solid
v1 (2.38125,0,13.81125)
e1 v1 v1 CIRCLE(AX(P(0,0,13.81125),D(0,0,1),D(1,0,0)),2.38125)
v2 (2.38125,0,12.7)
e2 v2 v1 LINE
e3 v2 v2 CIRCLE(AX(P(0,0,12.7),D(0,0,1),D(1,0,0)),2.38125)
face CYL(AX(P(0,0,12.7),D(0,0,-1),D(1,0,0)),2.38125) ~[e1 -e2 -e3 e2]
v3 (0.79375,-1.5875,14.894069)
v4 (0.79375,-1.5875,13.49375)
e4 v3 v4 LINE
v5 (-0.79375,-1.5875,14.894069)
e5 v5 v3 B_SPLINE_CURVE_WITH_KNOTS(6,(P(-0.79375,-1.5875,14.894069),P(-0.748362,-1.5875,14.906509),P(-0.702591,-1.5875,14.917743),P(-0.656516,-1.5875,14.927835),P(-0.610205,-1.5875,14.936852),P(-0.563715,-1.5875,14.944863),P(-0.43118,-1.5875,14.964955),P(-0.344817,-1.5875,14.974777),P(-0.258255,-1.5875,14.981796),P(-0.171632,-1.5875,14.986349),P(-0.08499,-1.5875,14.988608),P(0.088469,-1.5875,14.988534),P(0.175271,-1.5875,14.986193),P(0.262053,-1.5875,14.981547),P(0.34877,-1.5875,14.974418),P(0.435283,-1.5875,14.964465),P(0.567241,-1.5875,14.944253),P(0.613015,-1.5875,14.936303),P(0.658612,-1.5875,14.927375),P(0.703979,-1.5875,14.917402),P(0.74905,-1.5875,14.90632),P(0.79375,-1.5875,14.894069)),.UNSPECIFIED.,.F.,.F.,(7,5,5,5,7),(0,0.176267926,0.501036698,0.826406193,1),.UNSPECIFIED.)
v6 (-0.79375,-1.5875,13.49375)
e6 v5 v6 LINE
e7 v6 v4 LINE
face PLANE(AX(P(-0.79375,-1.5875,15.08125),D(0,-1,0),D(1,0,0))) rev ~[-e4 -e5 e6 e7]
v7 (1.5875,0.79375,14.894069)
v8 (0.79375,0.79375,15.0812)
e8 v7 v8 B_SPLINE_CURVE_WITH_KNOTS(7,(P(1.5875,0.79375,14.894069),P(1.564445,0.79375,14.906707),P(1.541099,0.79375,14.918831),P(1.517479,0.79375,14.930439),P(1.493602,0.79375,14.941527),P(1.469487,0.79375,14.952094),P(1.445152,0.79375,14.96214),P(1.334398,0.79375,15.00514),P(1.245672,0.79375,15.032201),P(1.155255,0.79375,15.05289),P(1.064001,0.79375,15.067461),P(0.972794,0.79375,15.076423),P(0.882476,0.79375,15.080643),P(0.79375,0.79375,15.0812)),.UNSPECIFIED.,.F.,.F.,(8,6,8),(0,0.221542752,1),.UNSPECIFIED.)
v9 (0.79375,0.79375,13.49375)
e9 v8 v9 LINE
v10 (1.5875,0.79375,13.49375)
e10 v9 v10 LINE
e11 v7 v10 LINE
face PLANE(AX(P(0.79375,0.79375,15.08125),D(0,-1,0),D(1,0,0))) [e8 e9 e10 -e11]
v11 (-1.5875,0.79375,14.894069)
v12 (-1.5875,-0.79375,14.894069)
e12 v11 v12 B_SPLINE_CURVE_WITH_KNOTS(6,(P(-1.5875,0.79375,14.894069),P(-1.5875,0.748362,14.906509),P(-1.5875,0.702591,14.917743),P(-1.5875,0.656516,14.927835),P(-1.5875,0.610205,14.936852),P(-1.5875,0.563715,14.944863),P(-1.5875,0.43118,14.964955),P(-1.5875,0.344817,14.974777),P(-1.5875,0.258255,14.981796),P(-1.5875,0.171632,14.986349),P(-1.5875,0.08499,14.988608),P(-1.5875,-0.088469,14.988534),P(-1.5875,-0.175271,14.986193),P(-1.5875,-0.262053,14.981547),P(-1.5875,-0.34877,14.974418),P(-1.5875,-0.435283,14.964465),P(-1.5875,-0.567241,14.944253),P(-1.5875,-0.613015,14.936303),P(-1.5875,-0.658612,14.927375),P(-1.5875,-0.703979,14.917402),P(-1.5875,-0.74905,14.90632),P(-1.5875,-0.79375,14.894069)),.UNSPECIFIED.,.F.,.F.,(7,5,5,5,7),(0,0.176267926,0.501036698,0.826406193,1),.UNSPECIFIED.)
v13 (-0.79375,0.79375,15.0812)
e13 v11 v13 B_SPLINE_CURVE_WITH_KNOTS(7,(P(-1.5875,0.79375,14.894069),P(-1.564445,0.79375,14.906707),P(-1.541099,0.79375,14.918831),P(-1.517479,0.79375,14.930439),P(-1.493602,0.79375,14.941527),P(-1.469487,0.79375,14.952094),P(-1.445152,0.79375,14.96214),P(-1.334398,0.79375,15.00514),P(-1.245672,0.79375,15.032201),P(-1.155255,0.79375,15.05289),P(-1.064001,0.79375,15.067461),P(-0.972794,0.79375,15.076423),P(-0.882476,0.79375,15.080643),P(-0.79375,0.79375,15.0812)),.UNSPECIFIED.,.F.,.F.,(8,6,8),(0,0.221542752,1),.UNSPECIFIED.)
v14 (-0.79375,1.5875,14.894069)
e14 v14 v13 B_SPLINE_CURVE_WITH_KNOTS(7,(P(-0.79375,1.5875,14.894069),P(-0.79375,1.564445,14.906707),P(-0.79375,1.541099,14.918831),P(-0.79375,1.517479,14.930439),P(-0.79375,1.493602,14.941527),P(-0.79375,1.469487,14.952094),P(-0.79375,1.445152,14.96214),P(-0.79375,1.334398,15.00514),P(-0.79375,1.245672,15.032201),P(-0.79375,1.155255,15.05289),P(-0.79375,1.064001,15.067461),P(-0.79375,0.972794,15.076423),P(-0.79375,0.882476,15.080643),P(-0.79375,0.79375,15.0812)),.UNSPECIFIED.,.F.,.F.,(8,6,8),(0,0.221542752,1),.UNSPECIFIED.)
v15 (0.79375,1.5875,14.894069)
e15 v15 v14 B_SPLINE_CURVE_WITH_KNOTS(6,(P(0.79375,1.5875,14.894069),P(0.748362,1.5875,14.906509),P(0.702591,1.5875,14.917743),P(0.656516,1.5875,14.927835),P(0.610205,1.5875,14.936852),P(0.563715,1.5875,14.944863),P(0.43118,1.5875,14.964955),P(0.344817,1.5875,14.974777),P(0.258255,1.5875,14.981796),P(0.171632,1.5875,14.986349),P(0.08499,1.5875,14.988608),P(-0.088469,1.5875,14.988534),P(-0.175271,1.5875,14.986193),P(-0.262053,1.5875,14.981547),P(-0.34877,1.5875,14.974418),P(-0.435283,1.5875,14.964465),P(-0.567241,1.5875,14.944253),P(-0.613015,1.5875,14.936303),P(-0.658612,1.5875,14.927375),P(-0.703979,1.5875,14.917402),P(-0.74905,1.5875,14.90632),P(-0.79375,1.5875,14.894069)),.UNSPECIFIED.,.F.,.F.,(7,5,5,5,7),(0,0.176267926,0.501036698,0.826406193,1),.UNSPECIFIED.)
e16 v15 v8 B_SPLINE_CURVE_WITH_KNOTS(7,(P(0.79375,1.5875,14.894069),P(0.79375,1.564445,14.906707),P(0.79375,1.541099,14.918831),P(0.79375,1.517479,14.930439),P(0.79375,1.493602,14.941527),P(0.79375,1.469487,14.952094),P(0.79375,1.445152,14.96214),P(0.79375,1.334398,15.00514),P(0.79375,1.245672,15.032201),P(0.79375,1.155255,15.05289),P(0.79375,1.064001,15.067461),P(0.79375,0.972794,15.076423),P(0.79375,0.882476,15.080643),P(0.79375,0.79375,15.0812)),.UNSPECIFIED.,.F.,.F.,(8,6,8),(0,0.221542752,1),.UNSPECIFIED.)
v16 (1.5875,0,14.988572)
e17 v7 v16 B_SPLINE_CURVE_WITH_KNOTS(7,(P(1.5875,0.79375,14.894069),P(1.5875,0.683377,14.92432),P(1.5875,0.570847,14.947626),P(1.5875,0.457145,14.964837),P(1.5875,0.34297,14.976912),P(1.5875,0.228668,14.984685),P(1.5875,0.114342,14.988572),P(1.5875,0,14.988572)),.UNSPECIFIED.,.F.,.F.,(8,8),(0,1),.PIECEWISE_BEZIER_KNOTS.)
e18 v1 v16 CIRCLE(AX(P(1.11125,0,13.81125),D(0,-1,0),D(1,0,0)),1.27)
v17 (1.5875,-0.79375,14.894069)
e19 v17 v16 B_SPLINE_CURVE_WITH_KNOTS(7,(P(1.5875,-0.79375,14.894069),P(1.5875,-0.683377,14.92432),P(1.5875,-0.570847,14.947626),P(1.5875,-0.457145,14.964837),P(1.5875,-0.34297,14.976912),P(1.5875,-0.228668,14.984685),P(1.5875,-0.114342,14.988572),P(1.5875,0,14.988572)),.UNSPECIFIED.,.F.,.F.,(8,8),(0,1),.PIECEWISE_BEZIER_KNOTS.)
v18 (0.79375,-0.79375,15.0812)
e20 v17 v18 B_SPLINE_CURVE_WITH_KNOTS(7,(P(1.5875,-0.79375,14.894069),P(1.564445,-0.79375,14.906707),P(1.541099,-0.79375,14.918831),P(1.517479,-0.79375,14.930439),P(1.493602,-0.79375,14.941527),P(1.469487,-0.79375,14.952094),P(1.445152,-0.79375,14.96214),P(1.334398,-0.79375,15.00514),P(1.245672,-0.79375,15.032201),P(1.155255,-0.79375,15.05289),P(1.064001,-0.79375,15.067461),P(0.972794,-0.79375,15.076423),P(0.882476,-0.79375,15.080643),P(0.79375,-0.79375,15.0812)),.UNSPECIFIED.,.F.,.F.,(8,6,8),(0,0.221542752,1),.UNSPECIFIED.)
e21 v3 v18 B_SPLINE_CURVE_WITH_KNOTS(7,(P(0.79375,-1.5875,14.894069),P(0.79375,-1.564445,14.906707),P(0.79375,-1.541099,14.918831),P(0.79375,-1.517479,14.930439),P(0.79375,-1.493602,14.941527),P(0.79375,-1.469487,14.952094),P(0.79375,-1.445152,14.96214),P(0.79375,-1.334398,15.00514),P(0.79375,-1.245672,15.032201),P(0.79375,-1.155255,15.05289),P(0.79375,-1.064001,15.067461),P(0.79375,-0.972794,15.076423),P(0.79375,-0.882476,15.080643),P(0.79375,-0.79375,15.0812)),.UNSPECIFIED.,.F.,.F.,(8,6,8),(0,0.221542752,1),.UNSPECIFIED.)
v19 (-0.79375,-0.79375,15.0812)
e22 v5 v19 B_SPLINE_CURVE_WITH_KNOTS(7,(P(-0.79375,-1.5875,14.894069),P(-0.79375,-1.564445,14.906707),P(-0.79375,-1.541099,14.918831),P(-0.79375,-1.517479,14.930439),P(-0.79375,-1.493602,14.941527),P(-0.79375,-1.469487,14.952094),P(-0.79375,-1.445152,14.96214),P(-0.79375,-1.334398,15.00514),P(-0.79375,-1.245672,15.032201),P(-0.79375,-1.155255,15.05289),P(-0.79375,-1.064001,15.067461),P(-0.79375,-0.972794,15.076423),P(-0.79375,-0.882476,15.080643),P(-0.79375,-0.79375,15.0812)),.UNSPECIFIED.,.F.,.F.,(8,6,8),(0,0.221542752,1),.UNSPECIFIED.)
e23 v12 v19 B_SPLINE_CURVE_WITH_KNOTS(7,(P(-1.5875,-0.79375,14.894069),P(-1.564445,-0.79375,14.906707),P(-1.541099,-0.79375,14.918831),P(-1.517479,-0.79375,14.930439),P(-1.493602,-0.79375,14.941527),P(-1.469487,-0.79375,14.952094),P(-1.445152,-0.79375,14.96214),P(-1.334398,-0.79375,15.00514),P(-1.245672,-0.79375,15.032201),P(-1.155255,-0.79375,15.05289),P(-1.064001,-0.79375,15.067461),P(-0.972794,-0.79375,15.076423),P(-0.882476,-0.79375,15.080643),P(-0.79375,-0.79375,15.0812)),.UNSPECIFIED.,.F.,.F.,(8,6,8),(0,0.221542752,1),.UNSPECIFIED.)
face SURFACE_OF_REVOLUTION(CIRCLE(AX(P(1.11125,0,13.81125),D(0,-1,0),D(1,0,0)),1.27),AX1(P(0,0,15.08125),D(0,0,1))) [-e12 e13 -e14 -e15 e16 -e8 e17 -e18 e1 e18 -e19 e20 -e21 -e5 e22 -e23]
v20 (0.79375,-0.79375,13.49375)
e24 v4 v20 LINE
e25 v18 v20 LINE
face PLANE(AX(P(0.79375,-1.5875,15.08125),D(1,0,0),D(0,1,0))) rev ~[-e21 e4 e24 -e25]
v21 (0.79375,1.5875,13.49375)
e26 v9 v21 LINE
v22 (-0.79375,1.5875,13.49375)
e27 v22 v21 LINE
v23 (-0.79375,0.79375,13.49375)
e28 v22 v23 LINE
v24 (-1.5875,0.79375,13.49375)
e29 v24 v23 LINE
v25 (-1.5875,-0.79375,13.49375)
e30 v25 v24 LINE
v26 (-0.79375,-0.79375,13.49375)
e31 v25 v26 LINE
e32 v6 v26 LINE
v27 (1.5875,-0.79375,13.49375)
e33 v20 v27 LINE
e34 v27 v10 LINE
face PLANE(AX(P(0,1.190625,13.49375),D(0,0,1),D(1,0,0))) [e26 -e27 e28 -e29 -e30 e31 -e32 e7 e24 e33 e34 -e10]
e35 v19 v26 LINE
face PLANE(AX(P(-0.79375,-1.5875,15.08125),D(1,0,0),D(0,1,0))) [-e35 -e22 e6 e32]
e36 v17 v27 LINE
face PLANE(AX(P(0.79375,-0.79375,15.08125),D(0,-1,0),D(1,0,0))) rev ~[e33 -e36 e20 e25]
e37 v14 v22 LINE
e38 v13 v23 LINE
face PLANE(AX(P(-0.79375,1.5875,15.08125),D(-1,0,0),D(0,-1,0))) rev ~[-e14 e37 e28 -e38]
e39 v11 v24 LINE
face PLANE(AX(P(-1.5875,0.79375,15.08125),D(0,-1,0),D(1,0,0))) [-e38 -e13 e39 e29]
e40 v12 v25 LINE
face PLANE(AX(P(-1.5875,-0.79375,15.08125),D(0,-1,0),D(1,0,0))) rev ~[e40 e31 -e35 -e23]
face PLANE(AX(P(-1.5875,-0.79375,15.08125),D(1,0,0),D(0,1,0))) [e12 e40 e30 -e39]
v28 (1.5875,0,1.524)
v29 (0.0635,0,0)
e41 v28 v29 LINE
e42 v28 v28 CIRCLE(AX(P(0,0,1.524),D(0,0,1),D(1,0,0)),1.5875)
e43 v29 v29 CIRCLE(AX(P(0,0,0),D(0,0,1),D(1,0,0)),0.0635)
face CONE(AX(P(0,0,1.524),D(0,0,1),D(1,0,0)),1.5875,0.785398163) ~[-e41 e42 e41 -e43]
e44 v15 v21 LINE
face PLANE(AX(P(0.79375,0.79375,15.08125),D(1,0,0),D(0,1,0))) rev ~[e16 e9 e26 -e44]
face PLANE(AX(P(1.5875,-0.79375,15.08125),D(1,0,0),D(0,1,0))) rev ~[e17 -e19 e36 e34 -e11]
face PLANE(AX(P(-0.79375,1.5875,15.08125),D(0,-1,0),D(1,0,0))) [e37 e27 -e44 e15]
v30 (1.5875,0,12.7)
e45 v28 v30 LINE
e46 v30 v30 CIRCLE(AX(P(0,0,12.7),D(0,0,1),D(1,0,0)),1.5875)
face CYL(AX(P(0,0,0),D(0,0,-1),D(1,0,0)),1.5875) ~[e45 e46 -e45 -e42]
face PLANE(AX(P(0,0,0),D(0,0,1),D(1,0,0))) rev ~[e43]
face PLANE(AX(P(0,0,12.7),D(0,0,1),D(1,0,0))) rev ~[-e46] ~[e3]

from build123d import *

# Parameters (mm, degrees)
F0_R     = 1.5875
F1_DEPTH = 12.7
F2_SIZE  = 1.524
F3_R     = 2.38125
F4_DEPTH = 2.38125
F5_W     = 1.5875
F5_H     = 0.79375
F5_W_2   = 0.79375
F5_H_2   = 1.5875
F6_DEPTH = 1.5875


# Not quite as in the source:
# - a fillet or chamfer that OpenCascade refuses, or shapes differently, is made with other operations: its cross-section is extruded or revolved along the edge and cut away or added


with BuildPart() as f1:
    # F0 (on Top) → F1 (new body)
    with BuildSketch(Plane.XY):
        Circle(F0_R)
    extrude(amount=F1_DEPTH)

    # F2
    f2_edges = [f1.edges().sort_by_distance(p)[0] for p in [
        (-1.5875, 0, 0),
    ]]
    chamfer(f2_edges, length=F2_SIZE)

    # F3 (on face) → F4 (join)
    with BuildSketch(Plane.XY.offset(12.7)):
        Circle(F3_R)
    extrude(amount=F4_DEPTH)

    # F5 (on face) → F6 (cut)
    with BuildSketch(Plane.XY.offset(15.08125)):
        with Locations((0, 1.190625)):
            Rectangle(F5_W, F5_H)
        with Locations((1.190625, 0)):
            Rectangle(F5_W_2, F5_H_2)
        Rectangle(F5_W, F5_H_2)
        with Locations((-1.190625, 0)):
            Rectangle(F5_W_2, F5_H_2)
        with Locations((0, -1.190625)):
            Rectangle(F5_W, F5_H)
    extrude(amount=-F6_DEPTH, mode=Mode.SUBTRACT)

    # F7: fillet of radius 1.27 on 1 edges, made by hand

    # F7_s1 → F7_t2 (revolve, cut)
    with BuildSketch(Plane.XZ):
        with BuildLine():
            ThreePointArc((2.38125, 13.81125), (2.0092756121, 14.7092756121), (1.11125, 15.08125))
            Line((1.11125, 15.08125), (2.38125, 15.08125))
            Line((2.38125, 15.08125), (2.38125, 13.81125))
        make_face()
    revolve(axis=Axis((0, 0, 15.08125), (0, 0, 1)), mode=Mode.SUBTRACT)


solid = f1.part
